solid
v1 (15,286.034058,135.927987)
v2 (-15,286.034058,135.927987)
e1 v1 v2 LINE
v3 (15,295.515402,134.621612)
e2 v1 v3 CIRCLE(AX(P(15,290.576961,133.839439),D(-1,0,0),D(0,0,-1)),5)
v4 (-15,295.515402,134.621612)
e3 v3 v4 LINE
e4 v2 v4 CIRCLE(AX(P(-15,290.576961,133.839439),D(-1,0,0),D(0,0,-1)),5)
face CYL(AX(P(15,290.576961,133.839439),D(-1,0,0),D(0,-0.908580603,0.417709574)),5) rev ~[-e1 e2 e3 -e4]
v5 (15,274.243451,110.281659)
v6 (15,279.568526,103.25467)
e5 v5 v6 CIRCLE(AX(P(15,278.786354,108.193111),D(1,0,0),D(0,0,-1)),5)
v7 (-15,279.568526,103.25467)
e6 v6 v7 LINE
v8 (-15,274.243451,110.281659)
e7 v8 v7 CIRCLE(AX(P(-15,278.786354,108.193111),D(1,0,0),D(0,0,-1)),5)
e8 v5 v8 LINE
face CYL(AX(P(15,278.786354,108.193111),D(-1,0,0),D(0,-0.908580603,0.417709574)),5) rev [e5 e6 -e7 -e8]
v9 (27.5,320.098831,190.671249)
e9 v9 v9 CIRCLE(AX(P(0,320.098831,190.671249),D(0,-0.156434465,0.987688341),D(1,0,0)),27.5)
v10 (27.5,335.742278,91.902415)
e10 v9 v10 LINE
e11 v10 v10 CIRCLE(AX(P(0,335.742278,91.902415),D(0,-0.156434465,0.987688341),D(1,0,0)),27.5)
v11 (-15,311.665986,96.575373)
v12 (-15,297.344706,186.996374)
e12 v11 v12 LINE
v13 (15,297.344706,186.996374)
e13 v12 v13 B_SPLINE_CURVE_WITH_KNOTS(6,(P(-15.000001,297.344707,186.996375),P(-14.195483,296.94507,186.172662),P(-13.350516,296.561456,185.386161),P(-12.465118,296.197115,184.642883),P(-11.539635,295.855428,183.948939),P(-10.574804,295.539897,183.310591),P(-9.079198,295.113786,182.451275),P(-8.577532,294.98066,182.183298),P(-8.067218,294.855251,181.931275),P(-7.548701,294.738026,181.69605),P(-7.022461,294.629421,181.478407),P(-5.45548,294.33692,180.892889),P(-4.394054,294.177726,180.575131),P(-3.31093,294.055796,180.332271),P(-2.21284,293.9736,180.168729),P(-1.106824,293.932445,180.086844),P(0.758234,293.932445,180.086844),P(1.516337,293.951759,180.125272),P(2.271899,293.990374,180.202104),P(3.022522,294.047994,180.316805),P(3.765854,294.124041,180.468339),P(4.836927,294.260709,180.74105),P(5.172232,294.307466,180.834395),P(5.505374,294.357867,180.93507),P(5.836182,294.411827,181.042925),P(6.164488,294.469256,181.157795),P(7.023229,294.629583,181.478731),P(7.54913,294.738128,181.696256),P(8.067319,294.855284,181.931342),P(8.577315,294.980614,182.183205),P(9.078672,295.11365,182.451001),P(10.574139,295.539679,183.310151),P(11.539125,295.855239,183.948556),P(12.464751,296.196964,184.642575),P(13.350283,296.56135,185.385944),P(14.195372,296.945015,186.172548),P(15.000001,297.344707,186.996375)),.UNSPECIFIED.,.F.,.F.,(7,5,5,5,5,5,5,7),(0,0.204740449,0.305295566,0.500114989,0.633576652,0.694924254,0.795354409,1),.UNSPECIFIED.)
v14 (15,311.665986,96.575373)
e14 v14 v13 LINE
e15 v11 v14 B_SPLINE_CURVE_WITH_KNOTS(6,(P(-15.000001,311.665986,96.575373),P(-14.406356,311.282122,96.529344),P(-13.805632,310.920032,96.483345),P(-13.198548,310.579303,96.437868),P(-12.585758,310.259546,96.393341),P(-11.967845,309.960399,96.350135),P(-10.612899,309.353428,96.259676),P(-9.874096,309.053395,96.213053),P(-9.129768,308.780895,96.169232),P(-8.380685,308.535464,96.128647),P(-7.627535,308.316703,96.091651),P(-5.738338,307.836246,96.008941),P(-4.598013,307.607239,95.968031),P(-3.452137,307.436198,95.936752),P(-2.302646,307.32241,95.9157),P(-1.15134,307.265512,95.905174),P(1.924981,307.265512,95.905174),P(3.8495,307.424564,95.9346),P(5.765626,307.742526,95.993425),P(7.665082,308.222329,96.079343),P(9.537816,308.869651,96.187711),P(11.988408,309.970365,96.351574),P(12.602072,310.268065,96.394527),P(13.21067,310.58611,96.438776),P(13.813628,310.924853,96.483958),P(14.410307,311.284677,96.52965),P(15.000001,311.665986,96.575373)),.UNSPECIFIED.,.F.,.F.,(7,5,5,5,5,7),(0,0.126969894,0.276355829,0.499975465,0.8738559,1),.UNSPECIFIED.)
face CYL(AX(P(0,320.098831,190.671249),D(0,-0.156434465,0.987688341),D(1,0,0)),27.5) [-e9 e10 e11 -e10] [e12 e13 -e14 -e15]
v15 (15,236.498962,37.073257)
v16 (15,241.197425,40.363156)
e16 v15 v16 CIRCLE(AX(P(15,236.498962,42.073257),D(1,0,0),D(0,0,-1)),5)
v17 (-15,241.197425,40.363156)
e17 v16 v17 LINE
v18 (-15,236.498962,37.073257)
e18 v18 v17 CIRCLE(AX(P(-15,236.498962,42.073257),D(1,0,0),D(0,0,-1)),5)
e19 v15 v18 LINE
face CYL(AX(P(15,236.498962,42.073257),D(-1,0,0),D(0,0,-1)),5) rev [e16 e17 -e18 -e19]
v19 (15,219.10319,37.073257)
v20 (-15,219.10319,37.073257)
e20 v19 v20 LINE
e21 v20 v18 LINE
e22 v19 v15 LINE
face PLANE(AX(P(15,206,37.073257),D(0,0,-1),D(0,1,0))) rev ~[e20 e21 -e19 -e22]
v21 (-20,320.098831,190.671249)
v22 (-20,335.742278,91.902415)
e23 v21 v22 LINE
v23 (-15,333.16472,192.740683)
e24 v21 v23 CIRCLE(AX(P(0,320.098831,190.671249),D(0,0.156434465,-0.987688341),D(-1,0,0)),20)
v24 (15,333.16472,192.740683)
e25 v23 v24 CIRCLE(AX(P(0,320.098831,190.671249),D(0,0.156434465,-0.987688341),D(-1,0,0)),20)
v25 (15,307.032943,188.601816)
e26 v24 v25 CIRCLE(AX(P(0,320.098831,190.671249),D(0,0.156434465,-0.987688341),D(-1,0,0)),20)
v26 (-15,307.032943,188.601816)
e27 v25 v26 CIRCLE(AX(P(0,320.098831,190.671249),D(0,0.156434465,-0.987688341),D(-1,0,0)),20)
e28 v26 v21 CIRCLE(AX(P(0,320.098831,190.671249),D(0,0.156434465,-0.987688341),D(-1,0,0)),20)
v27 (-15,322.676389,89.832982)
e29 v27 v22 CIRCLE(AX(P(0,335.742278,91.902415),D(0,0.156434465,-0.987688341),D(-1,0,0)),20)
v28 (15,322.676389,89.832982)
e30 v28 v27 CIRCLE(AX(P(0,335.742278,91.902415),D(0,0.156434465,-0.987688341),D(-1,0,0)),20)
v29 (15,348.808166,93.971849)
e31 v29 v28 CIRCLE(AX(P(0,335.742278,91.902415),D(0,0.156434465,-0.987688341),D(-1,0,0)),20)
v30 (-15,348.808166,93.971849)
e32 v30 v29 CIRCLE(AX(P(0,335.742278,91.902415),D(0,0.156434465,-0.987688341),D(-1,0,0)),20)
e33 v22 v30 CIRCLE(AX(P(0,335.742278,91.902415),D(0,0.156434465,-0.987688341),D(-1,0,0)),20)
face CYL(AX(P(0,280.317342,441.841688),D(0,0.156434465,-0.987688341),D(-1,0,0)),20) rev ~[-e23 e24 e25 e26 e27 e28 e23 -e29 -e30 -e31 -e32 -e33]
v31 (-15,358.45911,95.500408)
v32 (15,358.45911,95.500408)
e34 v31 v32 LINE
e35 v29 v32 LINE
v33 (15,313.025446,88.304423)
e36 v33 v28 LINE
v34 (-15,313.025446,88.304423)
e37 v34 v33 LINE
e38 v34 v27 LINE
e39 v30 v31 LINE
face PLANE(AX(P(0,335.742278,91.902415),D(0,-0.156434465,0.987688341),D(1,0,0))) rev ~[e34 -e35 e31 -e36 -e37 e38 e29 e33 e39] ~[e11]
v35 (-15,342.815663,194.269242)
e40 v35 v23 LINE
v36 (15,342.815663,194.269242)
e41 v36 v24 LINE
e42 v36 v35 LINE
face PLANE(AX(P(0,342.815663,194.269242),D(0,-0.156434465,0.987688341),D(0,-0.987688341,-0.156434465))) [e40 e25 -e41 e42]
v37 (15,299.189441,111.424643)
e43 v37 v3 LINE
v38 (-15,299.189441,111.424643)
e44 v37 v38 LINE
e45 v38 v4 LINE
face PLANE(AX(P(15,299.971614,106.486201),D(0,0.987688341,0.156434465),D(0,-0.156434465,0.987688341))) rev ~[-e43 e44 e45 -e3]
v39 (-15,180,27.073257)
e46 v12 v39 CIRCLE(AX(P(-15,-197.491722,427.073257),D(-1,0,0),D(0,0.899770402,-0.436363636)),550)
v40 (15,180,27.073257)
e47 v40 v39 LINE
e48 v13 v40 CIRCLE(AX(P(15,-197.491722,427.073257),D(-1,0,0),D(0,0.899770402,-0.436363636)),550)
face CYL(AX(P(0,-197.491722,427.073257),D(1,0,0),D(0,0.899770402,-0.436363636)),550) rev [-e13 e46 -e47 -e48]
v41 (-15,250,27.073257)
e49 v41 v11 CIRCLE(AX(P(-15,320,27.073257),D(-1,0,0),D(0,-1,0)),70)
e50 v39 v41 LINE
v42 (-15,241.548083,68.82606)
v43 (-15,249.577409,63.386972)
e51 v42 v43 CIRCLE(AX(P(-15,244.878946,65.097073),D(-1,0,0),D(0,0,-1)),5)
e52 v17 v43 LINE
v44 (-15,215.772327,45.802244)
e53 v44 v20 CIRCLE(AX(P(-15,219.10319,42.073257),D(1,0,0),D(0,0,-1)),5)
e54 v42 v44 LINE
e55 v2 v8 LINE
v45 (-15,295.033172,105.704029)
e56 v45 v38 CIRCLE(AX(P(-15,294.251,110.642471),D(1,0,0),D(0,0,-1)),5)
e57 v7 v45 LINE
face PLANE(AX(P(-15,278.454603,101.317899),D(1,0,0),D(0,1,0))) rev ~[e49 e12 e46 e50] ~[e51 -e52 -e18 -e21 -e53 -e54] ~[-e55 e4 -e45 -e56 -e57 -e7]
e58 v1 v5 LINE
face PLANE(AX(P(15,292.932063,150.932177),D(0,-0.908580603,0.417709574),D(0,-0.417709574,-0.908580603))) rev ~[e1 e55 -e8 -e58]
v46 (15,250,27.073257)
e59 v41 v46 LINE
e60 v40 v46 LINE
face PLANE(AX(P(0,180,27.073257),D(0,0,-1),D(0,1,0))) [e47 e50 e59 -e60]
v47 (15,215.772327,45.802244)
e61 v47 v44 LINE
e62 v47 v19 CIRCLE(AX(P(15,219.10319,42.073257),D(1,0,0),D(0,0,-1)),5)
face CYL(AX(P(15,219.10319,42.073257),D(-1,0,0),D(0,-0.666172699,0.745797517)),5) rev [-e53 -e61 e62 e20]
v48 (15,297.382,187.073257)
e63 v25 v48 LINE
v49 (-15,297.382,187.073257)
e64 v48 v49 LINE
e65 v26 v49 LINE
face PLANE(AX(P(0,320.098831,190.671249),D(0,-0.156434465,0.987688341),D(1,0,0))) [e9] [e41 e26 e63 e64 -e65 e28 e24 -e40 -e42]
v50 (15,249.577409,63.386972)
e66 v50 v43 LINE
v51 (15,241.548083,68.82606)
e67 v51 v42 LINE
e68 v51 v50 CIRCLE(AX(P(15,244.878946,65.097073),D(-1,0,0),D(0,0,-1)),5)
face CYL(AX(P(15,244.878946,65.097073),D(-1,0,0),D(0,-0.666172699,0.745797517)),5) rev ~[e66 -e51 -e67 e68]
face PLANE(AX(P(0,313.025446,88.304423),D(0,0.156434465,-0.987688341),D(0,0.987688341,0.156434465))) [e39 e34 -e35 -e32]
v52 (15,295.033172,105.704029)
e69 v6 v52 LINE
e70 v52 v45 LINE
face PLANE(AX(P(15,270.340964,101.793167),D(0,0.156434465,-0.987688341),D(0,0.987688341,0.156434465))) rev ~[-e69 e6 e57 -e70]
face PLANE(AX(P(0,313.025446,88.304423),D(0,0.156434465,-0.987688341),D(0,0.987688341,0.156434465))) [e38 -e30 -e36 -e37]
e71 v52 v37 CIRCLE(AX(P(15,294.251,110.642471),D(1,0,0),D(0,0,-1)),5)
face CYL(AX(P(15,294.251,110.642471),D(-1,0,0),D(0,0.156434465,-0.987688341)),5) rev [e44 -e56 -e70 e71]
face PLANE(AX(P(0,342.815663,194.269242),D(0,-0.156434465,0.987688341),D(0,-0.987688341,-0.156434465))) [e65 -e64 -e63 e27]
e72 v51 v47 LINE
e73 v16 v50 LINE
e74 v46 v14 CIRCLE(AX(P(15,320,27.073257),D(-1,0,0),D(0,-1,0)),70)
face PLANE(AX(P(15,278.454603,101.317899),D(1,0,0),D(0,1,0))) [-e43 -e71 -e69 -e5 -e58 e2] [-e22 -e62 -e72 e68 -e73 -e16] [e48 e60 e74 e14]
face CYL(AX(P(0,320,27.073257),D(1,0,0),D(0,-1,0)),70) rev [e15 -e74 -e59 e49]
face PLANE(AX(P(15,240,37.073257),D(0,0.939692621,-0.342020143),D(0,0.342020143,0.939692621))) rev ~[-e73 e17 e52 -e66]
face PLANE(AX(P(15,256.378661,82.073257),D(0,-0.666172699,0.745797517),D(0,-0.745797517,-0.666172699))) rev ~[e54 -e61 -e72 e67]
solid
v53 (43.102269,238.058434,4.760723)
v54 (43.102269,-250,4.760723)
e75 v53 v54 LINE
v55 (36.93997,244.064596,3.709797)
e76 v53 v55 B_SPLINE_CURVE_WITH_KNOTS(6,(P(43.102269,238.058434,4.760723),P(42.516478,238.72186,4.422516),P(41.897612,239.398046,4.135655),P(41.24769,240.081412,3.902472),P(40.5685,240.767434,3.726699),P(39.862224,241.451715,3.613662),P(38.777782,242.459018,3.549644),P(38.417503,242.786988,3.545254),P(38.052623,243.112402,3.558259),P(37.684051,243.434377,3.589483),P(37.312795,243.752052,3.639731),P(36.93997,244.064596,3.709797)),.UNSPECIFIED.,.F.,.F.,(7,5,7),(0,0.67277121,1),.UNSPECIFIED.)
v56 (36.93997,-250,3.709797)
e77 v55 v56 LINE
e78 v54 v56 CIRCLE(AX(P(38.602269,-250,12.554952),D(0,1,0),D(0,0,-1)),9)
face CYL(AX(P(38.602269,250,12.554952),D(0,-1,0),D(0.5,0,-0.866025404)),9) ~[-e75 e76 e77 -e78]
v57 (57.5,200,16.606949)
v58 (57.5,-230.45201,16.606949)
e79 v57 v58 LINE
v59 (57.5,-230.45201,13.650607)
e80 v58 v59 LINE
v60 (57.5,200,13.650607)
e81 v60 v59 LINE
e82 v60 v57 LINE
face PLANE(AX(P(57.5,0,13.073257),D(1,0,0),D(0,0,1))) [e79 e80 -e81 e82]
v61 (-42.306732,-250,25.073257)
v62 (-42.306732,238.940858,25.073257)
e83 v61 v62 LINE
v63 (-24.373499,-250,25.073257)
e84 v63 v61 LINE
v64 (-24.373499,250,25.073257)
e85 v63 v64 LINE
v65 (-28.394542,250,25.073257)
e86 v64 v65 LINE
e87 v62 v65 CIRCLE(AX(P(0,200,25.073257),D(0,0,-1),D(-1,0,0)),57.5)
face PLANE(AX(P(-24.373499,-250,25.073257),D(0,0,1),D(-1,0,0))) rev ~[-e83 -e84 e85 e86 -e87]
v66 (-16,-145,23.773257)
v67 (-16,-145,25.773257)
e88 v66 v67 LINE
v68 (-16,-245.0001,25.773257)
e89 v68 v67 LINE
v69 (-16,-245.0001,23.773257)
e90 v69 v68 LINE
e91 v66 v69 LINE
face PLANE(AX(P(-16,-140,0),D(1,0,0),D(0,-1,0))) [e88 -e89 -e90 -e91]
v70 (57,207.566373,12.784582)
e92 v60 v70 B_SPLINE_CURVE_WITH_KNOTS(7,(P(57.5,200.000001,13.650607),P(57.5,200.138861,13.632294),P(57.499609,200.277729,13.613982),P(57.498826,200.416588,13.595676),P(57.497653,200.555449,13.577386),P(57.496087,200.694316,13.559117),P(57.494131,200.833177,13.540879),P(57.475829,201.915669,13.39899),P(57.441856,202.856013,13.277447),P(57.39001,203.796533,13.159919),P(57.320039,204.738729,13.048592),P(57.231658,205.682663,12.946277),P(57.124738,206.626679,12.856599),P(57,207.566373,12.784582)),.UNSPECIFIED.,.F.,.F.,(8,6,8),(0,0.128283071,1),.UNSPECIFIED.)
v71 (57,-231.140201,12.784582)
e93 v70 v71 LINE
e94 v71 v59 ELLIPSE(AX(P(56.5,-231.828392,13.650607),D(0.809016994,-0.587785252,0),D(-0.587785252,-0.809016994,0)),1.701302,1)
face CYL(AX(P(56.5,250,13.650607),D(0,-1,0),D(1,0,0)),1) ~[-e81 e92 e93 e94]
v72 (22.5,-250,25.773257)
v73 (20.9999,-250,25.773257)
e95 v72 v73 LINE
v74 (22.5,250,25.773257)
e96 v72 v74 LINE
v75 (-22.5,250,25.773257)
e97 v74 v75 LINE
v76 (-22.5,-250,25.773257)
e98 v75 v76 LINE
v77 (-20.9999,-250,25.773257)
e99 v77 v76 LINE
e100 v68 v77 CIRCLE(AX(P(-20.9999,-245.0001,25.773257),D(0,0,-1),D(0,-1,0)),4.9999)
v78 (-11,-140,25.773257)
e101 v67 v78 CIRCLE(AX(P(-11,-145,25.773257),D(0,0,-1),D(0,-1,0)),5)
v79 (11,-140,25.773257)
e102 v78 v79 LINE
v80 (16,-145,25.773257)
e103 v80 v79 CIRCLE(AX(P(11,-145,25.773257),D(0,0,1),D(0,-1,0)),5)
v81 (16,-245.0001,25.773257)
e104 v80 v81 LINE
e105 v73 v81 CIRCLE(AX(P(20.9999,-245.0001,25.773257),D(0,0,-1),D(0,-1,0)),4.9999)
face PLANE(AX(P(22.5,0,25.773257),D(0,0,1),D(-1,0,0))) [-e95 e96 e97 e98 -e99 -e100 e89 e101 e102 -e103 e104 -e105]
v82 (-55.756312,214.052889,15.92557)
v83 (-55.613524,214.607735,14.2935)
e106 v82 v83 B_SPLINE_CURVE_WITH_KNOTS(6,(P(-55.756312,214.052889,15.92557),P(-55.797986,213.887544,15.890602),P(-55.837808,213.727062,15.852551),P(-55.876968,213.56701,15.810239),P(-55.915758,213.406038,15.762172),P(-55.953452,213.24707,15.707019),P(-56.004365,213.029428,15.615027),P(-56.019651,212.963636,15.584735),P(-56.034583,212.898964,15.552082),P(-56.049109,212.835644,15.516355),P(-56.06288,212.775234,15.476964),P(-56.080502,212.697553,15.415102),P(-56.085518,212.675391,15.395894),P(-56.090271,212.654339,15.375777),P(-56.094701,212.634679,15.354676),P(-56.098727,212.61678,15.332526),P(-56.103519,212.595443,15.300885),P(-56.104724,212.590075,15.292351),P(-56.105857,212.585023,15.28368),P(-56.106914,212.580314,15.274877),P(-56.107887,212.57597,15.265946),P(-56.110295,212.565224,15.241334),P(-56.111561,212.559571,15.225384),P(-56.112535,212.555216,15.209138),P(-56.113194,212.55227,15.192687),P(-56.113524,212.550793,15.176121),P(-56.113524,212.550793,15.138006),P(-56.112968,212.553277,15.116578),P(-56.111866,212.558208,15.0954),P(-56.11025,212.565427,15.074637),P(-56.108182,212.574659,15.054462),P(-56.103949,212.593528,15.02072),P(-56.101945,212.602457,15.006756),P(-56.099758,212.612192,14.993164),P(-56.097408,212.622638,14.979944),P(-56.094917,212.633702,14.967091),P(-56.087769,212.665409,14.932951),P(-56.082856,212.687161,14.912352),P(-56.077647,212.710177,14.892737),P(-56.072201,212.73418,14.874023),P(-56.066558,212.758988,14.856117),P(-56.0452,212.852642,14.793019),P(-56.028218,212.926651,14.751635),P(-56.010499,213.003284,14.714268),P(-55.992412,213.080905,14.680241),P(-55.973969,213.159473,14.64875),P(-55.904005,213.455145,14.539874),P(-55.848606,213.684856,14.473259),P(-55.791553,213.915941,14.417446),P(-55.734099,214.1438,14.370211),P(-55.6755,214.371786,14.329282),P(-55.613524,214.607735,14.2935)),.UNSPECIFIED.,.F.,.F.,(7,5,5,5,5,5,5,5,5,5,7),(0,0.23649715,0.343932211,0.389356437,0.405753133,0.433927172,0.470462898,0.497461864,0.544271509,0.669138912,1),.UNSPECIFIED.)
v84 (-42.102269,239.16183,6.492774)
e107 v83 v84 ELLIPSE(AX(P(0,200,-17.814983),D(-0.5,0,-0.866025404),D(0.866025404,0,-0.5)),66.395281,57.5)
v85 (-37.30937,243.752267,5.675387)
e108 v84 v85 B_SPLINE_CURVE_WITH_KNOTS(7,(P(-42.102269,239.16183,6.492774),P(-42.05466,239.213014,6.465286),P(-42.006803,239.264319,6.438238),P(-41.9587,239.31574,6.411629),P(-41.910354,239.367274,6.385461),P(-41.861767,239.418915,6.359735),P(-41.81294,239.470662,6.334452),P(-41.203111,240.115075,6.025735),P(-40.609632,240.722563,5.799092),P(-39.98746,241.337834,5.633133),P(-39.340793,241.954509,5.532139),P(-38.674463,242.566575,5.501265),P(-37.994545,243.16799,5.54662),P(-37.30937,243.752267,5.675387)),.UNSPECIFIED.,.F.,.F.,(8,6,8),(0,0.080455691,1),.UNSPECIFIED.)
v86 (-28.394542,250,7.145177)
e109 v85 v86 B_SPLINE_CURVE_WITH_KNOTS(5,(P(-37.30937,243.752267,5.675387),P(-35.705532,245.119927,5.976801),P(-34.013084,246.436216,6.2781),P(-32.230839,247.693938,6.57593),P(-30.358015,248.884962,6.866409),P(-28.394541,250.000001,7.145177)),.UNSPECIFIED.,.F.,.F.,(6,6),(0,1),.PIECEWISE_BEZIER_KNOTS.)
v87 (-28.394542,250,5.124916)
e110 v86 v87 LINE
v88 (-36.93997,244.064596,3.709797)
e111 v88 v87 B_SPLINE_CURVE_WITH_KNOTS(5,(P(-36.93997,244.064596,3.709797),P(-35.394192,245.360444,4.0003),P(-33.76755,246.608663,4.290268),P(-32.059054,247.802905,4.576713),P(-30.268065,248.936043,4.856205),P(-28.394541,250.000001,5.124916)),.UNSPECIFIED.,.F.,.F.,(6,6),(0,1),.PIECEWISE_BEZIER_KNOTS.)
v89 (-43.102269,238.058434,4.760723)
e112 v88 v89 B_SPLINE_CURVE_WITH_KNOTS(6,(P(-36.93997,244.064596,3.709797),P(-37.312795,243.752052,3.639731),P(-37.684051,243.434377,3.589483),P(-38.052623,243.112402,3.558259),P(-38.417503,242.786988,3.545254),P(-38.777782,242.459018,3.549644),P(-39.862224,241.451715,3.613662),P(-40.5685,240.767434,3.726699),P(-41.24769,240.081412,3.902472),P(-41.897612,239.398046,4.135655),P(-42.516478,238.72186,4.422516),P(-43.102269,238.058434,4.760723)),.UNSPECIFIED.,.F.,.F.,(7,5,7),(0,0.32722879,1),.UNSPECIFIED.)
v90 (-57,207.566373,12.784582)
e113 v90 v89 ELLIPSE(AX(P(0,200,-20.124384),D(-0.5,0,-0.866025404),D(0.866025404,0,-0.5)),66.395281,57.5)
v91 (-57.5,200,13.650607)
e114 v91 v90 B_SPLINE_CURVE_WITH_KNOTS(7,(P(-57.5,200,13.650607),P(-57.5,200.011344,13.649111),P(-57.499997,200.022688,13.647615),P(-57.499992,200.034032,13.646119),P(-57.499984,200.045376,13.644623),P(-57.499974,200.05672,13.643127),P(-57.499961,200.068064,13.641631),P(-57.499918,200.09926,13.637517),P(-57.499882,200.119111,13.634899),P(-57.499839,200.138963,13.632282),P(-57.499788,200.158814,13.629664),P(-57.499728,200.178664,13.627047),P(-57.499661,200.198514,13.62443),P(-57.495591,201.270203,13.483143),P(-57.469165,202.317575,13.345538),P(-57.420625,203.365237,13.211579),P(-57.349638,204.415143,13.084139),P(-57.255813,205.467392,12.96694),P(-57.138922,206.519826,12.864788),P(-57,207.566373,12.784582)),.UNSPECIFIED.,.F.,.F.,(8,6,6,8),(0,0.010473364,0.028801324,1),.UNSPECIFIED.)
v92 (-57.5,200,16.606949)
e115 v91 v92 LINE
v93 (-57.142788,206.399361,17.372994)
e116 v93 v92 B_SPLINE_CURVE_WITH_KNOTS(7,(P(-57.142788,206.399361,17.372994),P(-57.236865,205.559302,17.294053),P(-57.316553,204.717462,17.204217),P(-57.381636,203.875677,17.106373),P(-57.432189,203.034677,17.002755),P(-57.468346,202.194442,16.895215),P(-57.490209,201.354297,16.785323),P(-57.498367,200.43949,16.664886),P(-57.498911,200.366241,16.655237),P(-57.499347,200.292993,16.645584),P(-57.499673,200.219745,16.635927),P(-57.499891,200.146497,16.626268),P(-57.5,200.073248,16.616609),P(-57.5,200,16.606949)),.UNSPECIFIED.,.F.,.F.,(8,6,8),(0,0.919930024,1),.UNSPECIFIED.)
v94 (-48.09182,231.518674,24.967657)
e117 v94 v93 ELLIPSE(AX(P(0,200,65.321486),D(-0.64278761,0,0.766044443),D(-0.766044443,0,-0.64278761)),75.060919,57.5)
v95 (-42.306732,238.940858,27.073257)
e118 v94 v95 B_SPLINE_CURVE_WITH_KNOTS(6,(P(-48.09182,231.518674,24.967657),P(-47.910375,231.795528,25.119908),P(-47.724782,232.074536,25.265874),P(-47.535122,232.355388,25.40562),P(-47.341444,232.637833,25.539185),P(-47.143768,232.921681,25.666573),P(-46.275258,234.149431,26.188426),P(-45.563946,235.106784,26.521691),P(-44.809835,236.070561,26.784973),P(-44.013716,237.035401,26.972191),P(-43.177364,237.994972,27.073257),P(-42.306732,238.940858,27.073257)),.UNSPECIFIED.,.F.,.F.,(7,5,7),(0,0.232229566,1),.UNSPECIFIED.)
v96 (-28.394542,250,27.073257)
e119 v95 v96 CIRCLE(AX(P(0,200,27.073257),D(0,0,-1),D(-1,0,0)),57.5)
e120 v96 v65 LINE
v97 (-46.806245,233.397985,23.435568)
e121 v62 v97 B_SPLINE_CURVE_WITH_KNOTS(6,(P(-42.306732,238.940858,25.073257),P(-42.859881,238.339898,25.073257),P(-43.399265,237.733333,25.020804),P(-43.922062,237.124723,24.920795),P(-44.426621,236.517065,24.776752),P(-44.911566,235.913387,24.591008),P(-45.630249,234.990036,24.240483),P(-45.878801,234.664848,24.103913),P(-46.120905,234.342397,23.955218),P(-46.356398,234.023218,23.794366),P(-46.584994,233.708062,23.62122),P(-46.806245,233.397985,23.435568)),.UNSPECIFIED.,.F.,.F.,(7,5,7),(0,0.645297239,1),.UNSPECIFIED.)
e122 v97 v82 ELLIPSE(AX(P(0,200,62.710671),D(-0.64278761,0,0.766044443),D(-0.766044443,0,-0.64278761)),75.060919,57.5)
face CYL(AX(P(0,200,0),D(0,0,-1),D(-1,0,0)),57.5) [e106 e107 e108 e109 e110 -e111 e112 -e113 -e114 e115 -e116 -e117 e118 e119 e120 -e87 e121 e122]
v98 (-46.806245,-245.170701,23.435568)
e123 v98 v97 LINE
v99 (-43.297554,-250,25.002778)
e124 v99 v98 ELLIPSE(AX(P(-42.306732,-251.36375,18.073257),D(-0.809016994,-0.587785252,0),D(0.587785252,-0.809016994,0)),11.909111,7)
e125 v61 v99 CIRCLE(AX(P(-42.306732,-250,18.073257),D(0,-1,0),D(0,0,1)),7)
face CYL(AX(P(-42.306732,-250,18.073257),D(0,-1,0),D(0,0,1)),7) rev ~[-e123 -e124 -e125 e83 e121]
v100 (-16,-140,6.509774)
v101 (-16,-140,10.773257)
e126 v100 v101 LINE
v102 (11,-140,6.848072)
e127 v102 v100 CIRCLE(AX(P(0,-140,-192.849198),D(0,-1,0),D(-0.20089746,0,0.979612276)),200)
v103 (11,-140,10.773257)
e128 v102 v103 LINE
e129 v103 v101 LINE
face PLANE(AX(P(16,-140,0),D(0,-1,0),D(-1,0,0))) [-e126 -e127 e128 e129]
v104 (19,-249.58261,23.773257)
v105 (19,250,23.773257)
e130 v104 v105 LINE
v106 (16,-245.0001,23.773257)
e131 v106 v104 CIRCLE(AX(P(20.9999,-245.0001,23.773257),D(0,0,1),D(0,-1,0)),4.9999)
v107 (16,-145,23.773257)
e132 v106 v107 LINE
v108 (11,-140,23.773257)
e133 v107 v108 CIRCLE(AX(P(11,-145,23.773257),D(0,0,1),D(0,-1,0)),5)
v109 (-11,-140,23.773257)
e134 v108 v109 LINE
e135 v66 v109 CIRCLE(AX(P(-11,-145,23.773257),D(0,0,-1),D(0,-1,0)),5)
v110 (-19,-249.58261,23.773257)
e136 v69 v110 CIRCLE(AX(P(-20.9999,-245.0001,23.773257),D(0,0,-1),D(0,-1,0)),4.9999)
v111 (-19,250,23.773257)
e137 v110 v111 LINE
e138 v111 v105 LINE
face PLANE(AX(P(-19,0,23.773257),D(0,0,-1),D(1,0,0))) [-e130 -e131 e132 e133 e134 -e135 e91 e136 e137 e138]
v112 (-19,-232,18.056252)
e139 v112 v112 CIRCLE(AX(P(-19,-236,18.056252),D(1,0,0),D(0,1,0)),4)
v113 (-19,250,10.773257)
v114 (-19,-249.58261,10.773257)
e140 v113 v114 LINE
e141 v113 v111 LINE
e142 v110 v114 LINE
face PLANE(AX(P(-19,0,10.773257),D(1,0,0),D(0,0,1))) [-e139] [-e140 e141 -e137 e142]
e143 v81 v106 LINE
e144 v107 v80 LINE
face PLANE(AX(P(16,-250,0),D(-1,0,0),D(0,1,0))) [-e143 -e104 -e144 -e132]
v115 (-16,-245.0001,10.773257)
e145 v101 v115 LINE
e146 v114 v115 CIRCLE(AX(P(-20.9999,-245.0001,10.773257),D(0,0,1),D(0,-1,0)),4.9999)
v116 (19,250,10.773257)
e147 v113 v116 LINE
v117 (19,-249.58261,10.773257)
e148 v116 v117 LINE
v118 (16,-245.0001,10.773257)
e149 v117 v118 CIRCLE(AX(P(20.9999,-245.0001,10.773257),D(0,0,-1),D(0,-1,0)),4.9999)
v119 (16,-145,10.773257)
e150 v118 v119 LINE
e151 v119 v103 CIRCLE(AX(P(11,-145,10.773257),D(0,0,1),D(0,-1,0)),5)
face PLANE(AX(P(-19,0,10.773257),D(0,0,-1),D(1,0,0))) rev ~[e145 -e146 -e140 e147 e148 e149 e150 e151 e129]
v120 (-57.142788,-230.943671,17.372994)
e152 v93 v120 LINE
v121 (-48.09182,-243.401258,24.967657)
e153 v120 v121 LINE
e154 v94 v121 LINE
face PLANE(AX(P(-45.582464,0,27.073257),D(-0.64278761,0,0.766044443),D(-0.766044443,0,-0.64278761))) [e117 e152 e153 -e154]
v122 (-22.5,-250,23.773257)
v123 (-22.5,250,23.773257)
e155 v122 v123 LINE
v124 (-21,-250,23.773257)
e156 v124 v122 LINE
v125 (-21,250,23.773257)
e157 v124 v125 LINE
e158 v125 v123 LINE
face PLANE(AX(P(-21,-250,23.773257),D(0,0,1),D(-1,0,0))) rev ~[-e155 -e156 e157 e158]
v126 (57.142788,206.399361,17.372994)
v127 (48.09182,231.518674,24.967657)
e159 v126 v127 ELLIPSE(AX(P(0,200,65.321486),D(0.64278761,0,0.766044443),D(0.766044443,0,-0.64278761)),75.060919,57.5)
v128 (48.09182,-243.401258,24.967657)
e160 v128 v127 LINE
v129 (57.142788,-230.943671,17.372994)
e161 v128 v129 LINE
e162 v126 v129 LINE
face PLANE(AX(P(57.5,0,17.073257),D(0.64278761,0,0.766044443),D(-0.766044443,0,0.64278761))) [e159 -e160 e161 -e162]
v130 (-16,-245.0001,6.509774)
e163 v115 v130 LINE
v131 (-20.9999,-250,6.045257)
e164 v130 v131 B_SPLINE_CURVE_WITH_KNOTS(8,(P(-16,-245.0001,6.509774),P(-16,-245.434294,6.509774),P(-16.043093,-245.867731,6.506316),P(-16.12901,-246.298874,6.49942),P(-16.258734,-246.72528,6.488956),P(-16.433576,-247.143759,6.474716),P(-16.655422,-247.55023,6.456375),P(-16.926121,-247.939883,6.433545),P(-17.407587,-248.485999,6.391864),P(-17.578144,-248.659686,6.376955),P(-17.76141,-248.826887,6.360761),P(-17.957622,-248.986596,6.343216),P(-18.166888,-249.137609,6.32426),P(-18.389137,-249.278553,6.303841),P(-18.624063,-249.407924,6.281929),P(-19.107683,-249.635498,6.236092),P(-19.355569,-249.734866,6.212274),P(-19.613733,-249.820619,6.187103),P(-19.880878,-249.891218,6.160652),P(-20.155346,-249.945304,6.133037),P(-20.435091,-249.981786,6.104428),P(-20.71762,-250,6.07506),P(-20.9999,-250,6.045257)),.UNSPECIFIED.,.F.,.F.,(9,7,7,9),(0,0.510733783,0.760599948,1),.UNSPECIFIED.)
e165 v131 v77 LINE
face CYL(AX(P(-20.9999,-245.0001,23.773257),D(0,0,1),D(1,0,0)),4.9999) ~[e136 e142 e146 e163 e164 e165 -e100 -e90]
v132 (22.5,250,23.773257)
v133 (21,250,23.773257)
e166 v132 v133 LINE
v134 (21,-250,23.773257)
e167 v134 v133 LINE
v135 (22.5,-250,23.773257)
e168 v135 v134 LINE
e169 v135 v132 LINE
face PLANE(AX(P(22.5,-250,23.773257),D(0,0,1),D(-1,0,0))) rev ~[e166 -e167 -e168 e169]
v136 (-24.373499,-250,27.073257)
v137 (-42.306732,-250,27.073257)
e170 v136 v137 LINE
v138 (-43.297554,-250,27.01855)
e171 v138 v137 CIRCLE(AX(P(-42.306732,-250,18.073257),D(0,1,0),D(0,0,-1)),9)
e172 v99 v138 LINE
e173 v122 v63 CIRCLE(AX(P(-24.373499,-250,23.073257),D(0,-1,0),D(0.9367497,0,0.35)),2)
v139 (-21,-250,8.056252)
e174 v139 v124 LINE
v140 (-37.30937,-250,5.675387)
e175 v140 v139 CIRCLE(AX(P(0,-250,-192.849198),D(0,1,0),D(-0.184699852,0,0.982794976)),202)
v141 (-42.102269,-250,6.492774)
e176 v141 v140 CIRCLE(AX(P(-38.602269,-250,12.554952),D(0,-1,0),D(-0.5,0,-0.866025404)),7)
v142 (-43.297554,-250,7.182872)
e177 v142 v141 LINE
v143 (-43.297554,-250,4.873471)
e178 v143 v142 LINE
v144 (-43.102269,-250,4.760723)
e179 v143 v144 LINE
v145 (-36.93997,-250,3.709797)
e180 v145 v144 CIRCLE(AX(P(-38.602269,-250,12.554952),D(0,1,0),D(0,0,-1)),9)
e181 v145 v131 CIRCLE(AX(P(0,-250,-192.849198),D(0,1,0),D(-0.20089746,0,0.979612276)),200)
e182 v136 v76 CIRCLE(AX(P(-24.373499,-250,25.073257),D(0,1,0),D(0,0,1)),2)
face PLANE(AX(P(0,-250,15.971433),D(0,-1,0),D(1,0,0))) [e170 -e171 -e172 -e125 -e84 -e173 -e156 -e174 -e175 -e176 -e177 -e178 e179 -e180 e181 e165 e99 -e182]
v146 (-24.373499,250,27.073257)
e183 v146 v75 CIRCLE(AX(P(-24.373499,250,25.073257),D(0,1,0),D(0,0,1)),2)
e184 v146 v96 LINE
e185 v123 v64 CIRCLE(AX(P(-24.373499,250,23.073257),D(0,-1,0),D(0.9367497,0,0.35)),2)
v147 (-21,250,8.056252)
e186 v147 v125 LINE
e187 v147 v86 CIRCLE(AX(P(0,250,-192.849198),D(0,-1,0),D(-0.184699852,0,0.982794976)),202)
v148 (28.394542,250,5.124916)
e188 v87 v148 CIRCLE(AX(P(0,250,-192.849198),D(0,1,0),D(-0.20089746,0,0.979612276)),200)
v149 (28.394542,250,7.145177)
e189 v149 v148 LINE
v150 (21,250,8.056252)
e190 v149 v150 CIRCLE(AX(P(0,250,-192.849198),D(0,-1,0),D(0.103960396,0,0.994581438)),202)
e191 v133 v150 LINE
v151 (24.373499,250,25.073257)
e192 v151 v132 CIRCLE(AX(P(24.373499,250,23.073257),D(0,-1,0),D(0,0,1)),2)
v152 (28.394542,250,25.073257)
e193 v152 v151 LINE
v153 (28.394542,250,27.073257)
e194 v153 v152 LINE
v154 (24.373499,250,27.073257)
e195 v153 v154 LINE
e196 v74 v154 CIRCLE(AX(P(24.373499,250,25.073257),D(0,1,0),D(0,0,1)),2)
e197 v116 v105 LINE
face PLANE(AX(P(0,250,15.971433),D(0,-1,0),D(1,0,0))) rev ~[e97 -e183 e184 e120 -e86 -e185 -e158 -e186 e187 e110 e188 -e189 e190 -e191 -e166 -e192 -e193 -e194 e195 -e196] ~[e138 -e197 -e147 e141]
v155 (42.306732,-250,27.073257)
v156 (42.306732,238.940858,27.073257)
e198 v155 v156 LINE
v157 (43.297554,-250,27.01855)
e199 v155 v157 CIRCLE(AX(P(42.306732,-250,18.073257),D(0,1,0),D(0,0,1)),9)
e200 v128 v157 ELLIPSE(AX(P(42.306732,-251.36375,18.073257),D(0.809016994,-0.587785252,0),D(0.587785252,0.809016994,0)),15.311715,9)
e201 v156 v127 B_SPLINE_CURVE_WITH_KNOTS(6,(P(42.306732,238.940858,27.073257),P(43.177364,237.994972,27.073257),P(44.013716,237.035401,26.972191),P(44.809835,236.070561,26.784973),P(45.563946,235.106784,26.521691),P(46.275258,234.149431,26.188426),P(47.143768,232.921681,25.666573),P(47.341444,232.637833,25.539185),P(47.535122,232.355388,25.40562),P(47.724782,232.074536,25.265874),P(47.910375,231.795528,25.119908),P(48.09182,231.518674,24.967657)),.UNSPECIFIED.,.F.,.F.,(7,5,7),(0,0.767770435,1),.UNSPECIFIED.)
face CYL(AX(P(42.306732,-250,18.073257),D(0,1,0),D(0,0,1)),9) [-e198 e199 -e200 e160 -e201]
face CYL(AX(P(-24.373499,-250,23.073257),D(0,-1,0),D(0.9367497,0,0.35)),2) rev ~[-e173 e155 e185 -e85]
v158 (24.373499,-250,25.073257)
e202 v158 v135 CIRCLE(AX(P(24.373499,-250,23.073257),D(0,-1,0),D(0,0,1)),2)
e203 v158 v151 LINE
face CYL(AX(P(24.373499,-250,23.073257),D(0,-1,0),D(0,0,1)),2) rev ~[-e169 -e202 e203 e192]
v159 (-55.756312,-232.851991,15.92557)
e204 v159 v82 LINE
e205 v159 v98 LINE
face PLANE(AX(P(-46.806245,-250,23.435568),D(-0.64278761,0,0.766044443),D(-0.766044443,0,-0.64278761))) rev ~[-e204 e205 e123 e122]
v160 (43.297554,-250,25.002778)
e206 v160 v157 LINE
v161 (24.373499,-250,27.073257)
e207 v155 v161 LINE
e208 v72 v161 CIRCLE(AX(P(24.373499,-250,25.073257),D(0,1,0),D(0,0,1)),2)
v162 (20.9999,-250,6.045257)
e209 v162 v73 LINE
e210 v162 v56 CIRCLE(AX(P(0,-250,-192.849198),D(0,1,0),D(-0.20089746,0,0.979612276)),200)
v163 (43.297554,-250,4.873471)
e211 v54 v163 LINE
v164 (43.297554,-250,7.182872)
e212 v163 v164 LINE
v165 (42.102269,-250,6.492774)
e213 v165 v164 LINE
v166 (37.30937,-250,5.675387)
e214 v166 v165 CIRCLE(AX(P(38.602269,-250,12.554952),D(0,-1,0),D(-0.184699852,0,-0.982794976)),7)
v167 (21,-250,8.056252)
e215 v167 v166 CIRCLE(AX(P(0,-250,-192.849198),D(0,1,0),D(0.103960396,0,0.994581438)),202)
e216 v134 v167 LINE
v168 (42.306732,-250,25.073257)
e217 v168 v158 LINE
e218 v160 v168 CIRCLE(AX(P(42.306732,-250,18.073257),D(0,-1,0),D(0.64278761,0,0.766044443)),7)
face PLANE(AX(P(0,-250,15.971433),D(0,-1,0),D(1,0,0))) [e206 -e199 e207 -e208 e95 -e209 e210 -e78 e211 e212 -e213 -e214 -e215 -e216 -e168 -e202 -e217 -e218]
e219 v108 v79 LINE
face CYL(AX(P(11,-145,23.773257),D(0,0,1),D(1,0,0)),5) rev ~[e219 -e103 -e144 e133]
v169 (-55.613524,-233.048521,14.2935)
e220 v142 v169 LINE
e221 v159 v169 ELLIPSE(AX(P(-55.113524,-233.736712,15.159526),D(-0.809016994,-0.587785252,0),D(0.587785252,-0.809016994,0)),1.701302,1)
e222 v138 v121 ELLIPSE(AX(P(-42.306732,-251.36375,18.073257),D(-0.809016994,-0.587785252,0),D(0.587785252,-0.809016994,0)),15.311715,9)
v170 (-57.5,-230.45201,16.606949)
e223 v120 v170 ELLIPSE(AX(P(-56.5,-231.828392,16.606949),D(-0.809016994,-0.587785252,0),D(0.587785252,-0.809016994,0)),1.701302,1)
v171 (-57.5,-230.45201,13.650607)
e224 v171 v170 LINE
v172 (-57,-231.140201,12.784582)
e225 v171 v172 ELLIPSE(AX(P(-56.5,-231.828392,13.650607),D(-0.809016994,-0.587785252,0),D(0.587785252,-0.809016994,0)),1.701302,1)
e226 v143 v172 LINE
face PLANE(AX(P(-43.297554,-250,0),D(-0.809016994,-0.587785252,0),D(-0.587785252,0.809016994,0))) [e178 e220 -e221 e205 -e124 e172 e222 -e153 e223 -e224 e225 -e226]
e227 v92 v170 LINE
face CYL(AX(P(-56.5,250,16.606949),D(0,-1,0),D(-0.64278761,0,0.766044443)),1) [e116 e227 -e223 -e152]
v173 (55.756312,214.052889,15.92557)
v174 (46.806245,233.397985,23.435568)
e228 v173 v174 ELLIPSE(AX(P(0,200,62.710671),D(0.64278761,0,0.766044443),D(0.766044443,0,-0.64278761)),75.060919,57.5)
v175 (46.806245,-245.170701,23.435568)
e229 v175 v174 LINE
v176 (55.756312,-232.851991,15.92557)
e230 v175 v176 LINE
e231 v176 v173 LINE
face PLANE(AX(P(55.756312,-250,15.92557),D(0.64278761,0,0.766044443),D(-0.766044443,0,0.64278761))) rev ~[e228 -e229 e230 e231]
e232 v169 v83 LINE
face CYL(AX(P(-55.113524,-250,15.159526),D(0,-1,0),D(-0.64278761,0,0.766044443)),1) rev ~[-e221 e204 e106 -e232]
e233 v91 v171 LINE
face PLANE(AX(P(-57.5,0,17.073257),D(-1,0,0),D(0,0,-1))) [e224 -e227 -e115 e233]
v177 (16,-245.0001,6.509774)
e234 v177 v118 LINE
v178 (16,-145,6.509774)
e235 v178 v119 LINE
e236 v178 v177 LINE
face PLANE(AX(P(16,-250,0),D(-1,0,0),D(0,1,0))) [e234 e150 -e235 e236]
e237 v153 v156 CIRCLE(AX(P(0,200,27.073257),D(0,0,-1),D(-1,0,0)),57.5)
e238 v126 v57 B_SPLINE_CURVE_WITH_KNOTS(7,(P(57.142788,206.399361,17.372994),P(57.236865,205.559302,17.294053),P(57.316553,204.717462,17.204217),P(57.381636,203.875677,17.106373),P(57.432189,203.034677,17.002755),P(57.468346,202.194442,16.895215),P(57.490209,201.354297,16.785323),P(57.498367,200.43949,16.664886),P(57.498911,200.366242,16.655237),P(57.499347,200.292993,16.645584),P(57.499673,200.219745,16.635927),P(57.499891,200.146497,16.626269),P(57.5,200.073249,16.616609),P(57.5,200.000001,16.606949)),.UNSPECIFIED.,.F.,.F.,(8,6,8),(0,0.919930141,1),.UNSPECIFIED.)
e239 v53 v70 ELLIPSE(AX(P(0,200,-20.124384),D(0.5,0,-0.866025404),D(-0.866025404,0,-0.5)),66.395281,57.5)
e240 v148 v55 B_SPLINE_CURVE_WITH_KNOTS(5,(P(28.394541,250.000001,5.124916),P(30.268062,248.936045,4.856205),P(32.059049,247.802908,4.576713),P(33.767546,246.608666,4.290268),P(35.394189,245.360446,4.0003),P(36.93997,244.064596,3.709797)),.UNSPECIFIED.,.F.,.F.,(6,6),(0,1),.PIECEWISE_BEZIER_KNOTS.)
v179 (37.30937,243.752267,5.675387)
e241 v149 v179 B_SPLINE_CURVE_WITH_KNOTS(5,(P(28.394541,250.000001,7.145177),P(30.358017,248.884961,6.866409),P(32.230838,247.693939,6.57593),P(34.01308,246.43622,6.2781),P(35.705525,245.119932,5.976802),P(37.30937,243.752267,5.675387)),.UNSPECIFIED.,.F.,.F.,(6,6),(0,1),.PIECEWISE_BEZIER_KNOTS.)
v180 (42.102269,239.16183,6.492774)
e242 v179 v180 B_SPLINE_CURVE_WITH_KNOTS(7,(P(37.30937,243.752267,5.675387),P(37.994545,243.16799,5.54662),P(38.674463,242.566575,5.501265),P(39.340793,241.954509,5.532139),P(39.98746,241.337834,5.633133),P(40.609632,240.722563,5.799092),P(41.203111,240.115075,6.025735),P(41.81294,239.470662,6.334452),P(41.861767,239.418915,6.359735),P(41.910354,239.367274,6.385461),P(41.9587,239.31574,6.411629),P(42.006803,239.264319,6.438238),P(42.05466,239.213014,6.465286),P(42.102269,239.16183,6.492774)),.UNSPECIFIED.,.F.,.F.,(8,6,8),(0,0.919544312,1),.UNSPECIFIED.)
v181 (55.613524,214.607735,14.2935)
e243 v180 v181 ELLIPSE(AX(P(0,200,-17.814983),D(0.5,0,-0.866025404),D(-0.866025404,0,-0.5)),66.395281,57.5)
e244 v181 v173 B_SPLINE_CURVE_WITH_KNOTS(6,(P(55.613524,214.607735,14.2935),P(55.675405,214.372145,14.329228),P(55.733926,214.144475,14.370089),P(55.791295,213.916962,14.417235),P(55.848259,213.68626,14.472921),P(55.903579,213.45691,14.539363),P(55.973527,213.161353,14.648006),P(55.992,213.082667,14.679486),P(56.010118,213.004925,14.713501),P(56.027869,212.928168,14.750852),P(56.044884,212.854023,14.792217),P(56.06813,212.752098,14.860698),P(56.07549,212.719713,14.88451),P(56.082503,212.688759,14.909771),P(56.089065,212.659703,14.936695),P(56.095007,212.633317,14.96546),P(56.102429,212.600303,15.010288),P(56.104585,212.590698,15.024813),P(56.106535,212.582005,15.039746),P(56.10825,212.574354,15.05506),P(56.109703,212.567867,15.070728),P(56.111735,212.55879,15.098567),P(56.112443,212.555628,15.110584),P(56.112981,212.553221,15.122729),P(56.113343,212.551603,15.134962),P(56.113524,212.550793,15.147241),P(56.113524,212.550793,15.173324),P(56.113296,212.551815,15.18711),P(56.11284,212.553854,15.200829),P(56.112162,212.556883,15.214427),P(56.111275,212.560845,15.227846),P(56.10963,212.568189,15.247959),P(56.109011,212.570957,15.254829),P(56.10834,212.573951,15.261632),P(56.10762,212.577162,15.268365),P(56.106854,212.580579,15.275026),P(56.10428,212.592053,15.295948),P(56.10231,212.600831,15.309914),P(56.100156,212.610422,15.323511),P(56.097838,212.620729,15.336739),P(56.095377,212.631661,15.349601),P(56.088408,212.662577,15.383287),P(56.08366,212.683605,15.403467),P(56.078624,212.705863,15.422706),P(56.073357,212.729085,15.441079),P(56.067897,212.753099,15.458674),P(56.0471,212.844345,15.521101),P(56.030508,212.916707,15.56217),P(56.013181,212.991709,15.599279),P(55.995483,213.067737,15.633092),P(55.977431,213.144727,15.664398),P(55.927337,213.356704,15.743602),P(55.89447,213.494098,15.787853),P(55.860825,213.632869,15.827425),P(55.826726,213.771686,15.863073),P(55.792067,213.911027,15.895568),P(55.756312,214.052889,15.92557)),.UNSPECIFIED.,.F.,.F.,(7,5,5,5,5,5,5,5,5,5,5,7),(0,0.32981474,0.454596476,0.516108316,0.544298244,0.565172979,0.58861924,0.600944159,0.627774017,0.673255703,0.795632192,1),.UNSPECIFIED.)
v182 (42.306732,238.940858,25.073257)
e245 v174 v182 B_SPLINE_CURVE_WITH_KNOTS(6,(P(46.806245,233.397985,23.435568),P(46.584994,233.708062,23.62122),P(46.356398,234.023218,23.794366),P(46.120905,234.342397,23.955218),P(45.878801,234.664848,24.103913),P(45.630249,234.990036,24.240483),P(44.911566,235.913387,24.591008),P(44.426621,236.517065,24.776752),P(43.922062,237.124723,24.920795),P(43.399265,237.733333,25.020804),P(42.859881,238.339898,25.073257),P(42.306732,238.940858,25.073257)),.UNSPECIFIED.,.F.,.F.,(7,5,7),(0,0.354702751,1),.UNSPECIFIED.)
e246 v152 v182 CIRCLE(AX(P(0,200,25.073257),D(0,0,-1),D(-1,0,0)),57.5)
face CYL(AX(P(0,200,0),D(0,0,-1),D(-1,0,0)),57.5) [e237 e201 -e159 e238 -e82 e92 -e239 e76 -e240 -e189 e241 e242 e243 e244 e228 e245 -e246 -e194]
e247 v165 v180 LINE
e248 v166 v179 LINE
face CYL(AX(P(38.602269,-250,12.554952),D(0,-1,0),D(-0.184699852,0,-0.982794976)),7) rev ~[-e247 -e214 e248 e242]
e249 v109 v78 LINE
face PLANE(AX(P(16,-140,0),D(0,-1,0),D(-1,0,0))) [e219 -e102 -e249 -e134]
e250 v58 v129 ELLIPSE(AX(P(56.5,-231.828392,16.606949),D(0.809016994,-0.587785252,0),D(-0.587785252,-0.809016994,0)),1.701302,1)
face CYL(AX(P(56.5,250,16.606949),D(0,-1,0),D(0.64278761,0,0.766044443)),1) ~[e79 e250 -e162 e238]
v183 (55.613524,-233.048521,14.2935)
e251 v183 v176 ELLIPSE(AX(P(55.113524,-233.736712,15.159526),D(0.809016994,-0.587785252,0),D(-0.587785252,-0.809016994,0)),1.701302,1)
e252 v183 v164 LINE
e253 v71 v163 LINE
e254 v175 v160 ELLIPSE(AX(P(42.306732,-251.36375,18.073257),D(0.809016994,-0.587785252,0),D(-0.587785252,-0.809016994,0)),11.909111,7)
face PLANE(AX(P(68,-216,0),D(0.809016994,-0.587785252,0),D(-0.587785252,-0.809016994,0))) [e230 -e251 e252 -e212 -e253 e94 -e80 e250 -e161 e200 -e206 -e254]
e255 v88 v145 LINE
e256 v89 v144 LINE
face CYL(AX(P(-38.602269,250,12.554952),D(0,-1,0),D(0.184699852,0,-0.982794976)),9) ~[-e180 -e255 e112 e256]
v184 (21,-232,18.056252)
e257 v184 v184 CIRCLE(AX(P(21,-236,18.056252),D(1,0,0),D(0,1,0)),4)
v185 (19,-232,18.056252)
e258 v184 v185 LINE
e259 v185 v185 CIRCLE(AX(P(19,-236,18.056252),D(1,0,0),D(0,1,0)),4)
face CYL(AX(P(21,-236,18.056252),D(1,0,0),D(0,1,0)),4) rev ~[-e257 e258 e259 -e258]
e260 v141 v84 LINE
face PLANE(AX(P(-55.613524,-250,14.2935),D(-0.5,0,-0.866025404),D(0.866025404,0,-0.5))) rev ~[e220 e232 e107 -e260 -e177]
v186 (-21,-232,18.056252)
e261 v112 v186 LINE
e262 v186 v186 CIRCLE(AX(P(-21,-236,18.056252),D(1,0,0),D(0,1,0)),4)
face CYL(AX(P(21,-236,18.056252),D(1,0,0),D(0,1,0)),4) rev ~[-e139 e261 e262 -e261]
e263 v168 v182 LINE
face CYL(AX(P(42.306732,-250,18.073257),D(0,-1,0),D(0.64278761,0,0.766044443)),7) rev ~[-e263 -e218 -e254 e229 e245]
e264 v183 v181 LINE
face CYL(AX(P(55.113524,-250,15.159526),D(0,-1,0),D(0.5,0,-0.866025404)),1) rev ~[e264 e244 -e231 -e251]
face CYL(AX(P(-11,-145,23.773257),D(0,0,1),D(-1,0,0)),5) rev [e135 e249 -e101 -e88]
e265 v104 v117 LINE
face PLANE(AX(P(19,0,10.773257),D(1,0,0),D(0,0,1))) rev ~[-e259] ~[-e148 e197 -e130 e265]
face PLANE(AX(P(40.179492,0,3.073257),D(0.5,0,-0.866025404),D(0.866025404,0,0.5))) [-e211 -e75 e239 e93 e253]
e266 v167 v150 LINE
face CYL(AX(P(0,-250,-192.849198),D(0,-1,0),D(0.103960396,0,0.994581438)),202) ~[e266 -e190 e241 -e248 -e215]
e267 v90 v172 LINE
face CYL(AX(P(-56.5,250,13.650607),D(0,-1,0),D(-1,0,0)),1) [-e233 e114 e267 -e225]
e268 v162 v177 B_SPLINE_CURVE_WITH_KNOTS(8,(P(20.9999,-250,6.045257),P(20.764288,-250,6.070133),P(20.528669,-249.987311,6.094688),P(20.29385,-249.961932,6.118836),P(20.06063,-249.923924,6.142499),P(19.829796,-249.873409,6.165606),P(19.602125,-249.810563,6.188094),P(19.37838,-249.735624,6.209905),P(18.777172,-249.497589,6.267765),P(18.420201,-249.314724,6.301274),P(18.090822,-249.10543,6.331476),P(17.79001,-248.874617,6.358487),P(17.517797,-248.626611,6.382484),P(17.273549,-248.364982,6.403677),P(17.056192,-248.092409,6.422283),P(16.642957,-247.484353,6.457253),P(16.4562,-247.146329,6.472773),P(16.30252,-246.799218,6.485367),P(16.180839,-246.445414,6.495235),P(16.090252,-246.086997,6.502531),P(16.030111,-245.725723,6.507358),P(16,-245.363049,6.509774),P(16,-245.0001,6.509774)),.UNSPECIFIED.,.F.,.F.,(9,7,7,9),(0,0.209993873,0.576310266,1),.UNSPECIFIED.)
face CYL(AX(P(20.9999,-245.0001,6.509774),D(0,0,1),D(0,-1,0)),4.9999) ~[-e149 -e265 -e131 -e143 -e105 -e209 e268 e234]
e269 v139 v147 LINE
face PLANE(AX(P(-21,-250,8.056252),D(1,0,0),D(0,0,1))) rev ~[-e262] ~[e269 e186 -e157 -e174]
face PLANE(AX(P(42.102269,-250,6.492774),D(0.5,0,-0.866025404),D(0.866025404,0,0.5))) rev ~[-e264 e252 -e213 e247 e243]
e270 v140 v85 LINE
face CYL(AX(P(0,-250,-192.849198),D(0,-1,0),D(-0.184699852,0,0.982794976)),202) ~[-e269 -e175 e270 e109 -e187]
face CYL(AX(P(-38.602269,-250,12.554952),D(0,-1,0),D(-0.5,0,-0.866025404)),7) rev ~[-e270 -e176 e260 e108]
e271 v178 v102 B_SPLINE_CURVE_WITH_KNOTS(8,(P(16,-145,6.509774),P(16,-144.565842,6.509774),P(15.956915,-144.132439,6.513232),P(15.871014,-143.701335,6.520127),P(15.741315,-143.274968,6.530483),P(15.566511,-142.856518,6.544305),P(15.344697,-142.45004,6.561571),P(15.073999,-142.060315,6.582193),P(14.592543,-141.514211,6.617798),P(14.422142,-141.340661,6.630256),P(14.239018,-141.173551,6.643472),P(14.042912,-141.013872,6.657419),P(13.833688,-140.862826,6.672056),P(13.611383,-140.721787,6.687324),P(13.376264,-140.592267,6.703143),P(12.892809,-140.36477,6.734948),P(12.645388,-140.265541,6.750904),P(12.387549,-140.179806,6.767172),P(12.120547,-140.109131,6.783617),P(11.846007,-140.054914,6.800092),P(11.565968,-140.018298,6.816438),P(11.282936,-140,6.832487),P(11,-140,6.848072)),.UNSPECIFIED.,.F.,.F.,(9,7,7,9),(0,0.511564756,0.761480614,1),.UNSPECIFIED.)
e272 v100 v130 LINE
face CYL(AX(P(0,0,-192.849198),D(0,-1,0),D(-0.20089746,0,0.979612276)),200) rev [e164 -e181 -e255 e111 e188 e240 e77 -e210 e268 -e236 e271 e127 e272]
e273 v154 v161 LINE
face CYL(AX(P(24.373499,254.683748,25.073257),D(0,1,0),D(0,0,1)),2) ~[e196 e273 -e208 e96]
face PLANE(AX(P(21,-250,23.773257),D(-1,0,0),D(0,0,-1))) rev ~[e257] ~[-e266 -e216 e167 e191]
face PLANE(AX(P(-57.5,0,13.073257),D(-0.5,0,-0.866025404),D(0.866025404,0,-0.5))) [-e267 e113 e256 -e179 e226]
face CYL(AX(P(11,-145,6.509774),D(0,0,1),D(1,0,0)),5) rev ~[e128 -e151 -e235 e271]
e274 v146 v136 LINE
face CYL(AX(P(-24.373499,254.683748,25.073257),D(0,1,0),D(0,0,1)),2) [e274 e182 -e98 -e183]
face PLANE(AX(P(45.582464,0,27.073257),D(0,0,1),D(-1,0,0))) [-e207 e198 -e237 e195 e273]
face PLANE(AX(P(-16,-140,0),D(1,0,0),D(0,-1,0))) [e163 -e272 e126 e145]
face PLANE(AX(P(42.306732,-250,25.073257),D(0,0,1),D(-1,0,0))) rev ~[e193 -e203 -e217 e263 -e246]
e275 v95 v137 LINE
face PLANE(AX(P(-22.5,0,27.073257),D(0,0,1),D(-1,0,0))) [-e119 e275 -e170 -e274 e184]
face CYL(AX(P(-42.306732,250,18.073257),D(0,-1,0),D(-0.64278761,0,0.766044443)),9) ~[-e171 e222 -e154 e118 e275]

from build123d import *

# Parameters (mm, degrees)
F1_DEPTH       = 250
F2_W           = 38
F2_H           = 13
F3_DEPTH       = 250
F4_T1_DEPTH    = 509.3674969976
F5_R           = 9
F6_R           = 1
F8_DEPTH       = 500.001
F10_DEPTH      = 529
F10_DEPTH_BACK = 27.0742567341
F12_DEPTH      = 27.0742568341
F12_DEPTH_BACK = 530
F13_F1_R       = 4.9999
F13_F2_R       = 5
F13_F3_R       = 5
F13_F4_R       = 4.9999
F13_F5_R       = 5
F15_DEPTH      = 15
F16_R          = 27.5
F17_DEPTH      = 100
F19_D          = 40
F21_D          = 8
F21_DEPTH      = 66
F21_TIP        = 2.4034424761
F23_DEPTH      = 72.5010001
F24_R          = 5


# Not quite as in the source:
# - a fillet or chamfer that OpenCascade refuses, or shapes differently, is made with other operations: its cross-section is extruded or revolved along the edge and cut away or added
# - a fillet or chamfer is up to 0.001 mm smaller than in the source, because OpenCascade refuses the exact size
# - an extrude ends at something that could not be found from the text; its depth is read off the source's solid


with BuildPart() as f1:
    # F0 (on Front) → F1 (new body, symmetric)
    with BuildSketch(Plane.XZ):
        with BuildLine():
            Line((22.5, 25.7732567341), (0, 25.7732567341))
            Line((0, 25.7732567341), (-22.5, 25.7732567341))
            Line((-22.5, 25.7732567341), (-22.5, 27.0732567341))
            Line((-22.5, 27.0732567341), (-45.5824640741, 27.0732567341))
            Line((-45.5824640741, 27.0732567341), (-57.5, 17.0732567341))
            Line((-57.5, 17.0732567341), (-57.5, 13.0732567341))
            Line((-57.5, 13.0732567341), (-40.1794919243, 3.0732567341))
            ThreePointArc((-40.1794919243, 3.0732567341), (0, 7.1508015925), (40.1794919243, 3.0732567341))
            Line((40.1794919243, 3.0732567341), (57.5, 13.0732567341))
            Line((57.5, 13.0732567341), (57.5, 17.0732567341))
            Line((57.5, 17.0732567341), (45.5824640741, 27.0732567341))
            Line((45.5824640741, 27.0732567341), (22.5, 27.0732567341))
            Line((22.5, 27.0732567341), (22.5, 25.7732567341))
        make_face()
    extrude(amount=F1_DEPTH, both=True)

    # F2 (on Front) → F3 (cut, symmetric)
    with BuildSketch(Plane.XZ):
        with Locations((0, 17.2732567341)):
            Rectangle(F2_W, F2_H)
    extrude(amount=F3_DEPTH, both=True, mode=Mode.SUBTRACT)

    # F4: fillet of radius 2 on 2 edges, made by hand

    # F4_s2 → F4_t1 (cut)
    with BuildSketch(Plane.XZ.offset(-254.6837484988)):
        with BuildLine():
            ThreePointArc((-24.3734993995, 27.0732567341), (-23.2333239744, 26.7164244066), (-22.5, 25.7732567341))
            Line((-22.5, 25.7732567341), (-22.5, 27.0732567341))
            Line((-22.5, 27.0732567341), (-24.3734993995, 27.0732567341))
        make_face()
        with BuildLine():
            ThreePointArc((24.3734993995, 27.0732567341), (23.2333239744, 26.7164244066), (22.5, 25.7732567341))
            Line((22.5, 25.7732567341), (22.5, 27.0732567341))
            Line((22.5, 27.0732567341), (24.3734993995, 27.0732567341))
        make_face()
    extrude(amount=F4_T1_DEPTH, mode=Mode.SUBTRACT)

    # F5
    f5_edges = [f1.edges().sort_by_distance(p)[0] for p in [
        (-45.582464, 0, 27.073257),
        (45.582464, 0, 27.073257),
        (40.179492, 0, 3.073257),
        (-40.179492, 0, 3.073257),
    ]]
    fillet(f5_edges, radius=F5_R)

    # F6
    f6_edges = [f1.edges().sort_by_distance(p)[0] for p in [
        (57.5, 0, 17.073257),
        (57.5, 0, 13.073257),
        (-57.5, 0, 17.073257),
        (-57.5, 0, 13.073257),
    ]]
    fillet(f6_edges, radius=F6_R)

    # F7 (on face) → F8 (cut, through all)
    with BuildSketch(Plane.XZ.offset(250)):
        with BuildLine():
            ThreePointArc((-37.3093701274, 5.6753867217), (-29.1789785809, 7.0322344696), (-21, 8.0562519915))
            Line((-21, 8.0562519915), (-21, 10.7732567341))
            Line((-21, 10.7732567341), (-21, 23.7732567341))
            Line((-21, 23.7732567341), (-22.5, 23.7732567341))
            ThreePointArc((-22.5, 23.7732567341), (-23.2333239744, 24.7164244066), (-24.3734993995, 25.0732567341))
            Line((-24.3734993995, 25.0732567341), (-42.3067319657, 25.0732567341))
            ThreePointArc((-42.3067319657, 25.0732567341), (-44.7008729689, 24.6511050796), (-46.8062452335, 23.435567836))
            Line((-46.8062452335, 23.435567836), (-55.7563117574, 15.9255703167))
            ThreePointArc((-55.7563117574, 15.9255703167), (-56.1097188459, 15.0723701308), (-55.6135241478, 14.2935004698))
            Line((-55.6135241478, 14.2935004698), (-42.1022690923, 6.4927737264))
            ThreePointArc((-42.1022690923, 6.4927737264), (-39.7790673433, 5.6545786734), (-37.3093701274, 5.6753867217))
        make_face()
        with BuildLine():
            Line((42.3067319657, 25.0732567341), (24.3734993995, 25.0732567341))
            ThreePointArc((24.3734993995, 25.0732567341), (23.2333239744, 24.7164244066), (22.5, 23.7732567341))
            Line((22.5, 23.7732567341), (21, 23.7732567341))
            Line((21, 23.7732567341), (21, 10.7732567341))
            Line((21, 10.7732567341), (21, 8.0562519915))
            ThreePointArc((21, 8.0562519915), (29.1789785809, 7.0322344696), (37.3093701274, 5.6753867217))
            ThreePointArc((37.3093701274, 5.6753867217), (39.7790673433, 5.6545786734), (42.1022690923, 6.4927737264))
            Line((42.1022690923, 6.4927737264), (55.6135241478, 14.2935004698))
            ThreePointArc((55.6135241478, 14.2935004698), (56.1097188459, 15.0723701308), (55.7563117574, 15.9255703167))
            Line((55.7563117574, 15.9255703167), (46.8062452335, 23.435567836))
            ThreePointArc((46.8062452335, 23.435567836), (44.7008729689, 24.6511050796), (42.3067319657, 25.0732567341))
        make_face()
    extrude(amount=-F8_DEPTH, mode=Mode.SUBTRACT)

    # F9 (on Top) → F10 (cut, two sides)
    with BuildSketch(Plane.XY) as f10_sk:
        with BuildLine():
            ThreePointArc((-57.5, 200), (0, 257.5), (57.5, 200))
            Line((57.5, 200), (57.5, 280))
            Line((57.5, 280), (-57.5, 280))
            Line((-57.5, 280), (-57.5, 200))
        make_face()
    extrude(amount=-F10_DEPTH, mode=Mode.SUBTRACT)
    extrude(f10_sk.sketch, amount=F10_DEPTH_BACK, mode=Mode.SUBTRACT)

    # F11 (on Top) → F12 (cut, two sides)
    with BuildSketch(Plane.XY) as f12_sk:
        Polygon((-43.2975540478, -250), (-68, -216), (-68, -346), (68, -346), (68, -216), (43.2975540478, -250), (16, -250), (16, -140), (-16, -140), (-16, -250), align=None)
    extrude(amount=F12_DEPTH, mode=Mode.SUBTRACT)
    extrude(f12_sk.sketch, amount=-F12_DEPTH_BACK, mode=Mode.SUBTRACT)

    # F13: fillet of radius 5 on 7 edges, made by hand

    # F13_f1 (radius 5 in the source; OpenCascade refuses exactly that, so slightly less here)
    f13_f1_edges = [f1.edges().sort_by_distance(p)[0] for p in [
        (16, -250, 8.6415155184),
    ]]
    fillet(f13_f1_edges, radius=F13_F1_R)

    # F13_f2
    f13_f2_edges = [f1.edges().sort_by_distance(p)[0] for p in [
        (16, -140, 8.6415155184),
    ]]
    fillet(f13_f2_edges, radius=F13_F2_R)

    # F13_f3
    f13_f3_edges = [f1.edges().sort_by_distance(p)[0] for p in [
        (16, -140, 24.7732567341),
    ]]
    fillet(f13_f3_edges, radius=F13_F3_R)

    # F13_f4 (radius 5 in the source; OpenCascade refuses exactly that, so slightly less here)
    f13_f4_edges = [f1.edges().sort_by_distance(p)[0] for p in [
        (-16, -250, 24.7732567341),
    ]]
    fillet(f13_f4_edges, radius=F13_F4_R)

    # F13_f5
    f13_f5_edges = [f1.edges().sort_by_distance(p)[0] for p in [
        (-16, -140, 24.7732567341),
    ]]
    fillet(f13_f5_edges, radius=F13_F5_R)

    # F21 (one way)
    with BuildSketch(Plane.YZ.offset(21)):
        with Locations((-236, 18.0562519915)):
            Circle(F21_D / 2)
    extrude(amount=-F21_DEPTH, mode=Mode.SUBTRACT)
    with Locations(Plane.YZ.offset(21)):
        with Locations((-236, 18.0562519915)):
            with Locations((0, 0, -(F21_DEPTH + F21_TIP / 2))):  # 118° drill point
                Cone(0, F21_D / 2, F21_TIP, mode=Mode.SUBTRACT)


with BuildPart() as f15:
    # F14 (on Right) → F15 (new body, symmetric)
    with BuildSketch(Plane.YZ):
        with BuildLine():
            Line((180, 27.0732567341), (250, 27.0732567341))
            ThreePointArc((250, 27.0732567341), (267.6550746197, 73.5491514208), (311.7145367693, 96.5811778586))
            Line((311.7145367693, 96.5811778586), (313.0254460068, 88.3044226746))
            Line((313.0254460068, 88.3044226746), (358.4591096742, 95.5004080665))
            Line((358.4591096742, 95.5004080665), (342.8156631702, 194.269242126))
            Line((342.8156631702, 194.269242126), (297.3819995028, 187.0732567341))
            ThreePointArc((297.3819995028, 187.0732567341), (245.9666940414, 101.7355345871), (180, 27.0732567341))
        make_face()
    extrude(amount=F15_DEPTH, both=True)

    # F16 (on face) → F17 (join, through all)
    with BuildSketch(Plane(origin=(0, -21.6269522386, 136.547202454), x_dir=(1, 0, 0), z_dir=(0, -0.156434465, 0.9876883406))):
        with Locations((0, 345.9854384523)):
            Circle(F16_R)
    extrude(amount=-F17_DEPTH)

    # F19 (through all)
    with Locations(Plane(origin=(0, -21.6269522386, 136.547202454), x_dir=(1, 0, 0), z_dir=(0, -0.156434465, 0.9876883406))):
        with Locations((0, 345.9854384523)):
            Hole(F19_D / 2)

    # F22 (on face) → F23 (cut, through all)
    with BuildSketch(Plane.YZ.offset(15)):
        Polygon((256.378660542, 82.0732567341), (206, 37.0732567341), (240, 37.0732567341), align=None)
        Polygon((292.9320627918, 150.9321765961), (270.3409635007, 101.7931673181), (299.9716137186, 106.4862012693), align=None)
    extrude(amount=-F23_DEPTH, mode=Mode.SUBTRACT)

    # F24
    f24_edges = [f15.edges().sort_by_distance(p)[0] for p in [
        (0, 292.932063, 150.932177),
        (0, 270.340964, 101.793167),
        (0, 299.971614, 106.486201),
        (0, 240, 37.073257),
        (0, 256.378661, 82.073257),
        (0, 206, 37.073257),
    ]]
    fillet(f24_edges, radius=F24_R)


solid = Compound([f1.part, f15.part])
